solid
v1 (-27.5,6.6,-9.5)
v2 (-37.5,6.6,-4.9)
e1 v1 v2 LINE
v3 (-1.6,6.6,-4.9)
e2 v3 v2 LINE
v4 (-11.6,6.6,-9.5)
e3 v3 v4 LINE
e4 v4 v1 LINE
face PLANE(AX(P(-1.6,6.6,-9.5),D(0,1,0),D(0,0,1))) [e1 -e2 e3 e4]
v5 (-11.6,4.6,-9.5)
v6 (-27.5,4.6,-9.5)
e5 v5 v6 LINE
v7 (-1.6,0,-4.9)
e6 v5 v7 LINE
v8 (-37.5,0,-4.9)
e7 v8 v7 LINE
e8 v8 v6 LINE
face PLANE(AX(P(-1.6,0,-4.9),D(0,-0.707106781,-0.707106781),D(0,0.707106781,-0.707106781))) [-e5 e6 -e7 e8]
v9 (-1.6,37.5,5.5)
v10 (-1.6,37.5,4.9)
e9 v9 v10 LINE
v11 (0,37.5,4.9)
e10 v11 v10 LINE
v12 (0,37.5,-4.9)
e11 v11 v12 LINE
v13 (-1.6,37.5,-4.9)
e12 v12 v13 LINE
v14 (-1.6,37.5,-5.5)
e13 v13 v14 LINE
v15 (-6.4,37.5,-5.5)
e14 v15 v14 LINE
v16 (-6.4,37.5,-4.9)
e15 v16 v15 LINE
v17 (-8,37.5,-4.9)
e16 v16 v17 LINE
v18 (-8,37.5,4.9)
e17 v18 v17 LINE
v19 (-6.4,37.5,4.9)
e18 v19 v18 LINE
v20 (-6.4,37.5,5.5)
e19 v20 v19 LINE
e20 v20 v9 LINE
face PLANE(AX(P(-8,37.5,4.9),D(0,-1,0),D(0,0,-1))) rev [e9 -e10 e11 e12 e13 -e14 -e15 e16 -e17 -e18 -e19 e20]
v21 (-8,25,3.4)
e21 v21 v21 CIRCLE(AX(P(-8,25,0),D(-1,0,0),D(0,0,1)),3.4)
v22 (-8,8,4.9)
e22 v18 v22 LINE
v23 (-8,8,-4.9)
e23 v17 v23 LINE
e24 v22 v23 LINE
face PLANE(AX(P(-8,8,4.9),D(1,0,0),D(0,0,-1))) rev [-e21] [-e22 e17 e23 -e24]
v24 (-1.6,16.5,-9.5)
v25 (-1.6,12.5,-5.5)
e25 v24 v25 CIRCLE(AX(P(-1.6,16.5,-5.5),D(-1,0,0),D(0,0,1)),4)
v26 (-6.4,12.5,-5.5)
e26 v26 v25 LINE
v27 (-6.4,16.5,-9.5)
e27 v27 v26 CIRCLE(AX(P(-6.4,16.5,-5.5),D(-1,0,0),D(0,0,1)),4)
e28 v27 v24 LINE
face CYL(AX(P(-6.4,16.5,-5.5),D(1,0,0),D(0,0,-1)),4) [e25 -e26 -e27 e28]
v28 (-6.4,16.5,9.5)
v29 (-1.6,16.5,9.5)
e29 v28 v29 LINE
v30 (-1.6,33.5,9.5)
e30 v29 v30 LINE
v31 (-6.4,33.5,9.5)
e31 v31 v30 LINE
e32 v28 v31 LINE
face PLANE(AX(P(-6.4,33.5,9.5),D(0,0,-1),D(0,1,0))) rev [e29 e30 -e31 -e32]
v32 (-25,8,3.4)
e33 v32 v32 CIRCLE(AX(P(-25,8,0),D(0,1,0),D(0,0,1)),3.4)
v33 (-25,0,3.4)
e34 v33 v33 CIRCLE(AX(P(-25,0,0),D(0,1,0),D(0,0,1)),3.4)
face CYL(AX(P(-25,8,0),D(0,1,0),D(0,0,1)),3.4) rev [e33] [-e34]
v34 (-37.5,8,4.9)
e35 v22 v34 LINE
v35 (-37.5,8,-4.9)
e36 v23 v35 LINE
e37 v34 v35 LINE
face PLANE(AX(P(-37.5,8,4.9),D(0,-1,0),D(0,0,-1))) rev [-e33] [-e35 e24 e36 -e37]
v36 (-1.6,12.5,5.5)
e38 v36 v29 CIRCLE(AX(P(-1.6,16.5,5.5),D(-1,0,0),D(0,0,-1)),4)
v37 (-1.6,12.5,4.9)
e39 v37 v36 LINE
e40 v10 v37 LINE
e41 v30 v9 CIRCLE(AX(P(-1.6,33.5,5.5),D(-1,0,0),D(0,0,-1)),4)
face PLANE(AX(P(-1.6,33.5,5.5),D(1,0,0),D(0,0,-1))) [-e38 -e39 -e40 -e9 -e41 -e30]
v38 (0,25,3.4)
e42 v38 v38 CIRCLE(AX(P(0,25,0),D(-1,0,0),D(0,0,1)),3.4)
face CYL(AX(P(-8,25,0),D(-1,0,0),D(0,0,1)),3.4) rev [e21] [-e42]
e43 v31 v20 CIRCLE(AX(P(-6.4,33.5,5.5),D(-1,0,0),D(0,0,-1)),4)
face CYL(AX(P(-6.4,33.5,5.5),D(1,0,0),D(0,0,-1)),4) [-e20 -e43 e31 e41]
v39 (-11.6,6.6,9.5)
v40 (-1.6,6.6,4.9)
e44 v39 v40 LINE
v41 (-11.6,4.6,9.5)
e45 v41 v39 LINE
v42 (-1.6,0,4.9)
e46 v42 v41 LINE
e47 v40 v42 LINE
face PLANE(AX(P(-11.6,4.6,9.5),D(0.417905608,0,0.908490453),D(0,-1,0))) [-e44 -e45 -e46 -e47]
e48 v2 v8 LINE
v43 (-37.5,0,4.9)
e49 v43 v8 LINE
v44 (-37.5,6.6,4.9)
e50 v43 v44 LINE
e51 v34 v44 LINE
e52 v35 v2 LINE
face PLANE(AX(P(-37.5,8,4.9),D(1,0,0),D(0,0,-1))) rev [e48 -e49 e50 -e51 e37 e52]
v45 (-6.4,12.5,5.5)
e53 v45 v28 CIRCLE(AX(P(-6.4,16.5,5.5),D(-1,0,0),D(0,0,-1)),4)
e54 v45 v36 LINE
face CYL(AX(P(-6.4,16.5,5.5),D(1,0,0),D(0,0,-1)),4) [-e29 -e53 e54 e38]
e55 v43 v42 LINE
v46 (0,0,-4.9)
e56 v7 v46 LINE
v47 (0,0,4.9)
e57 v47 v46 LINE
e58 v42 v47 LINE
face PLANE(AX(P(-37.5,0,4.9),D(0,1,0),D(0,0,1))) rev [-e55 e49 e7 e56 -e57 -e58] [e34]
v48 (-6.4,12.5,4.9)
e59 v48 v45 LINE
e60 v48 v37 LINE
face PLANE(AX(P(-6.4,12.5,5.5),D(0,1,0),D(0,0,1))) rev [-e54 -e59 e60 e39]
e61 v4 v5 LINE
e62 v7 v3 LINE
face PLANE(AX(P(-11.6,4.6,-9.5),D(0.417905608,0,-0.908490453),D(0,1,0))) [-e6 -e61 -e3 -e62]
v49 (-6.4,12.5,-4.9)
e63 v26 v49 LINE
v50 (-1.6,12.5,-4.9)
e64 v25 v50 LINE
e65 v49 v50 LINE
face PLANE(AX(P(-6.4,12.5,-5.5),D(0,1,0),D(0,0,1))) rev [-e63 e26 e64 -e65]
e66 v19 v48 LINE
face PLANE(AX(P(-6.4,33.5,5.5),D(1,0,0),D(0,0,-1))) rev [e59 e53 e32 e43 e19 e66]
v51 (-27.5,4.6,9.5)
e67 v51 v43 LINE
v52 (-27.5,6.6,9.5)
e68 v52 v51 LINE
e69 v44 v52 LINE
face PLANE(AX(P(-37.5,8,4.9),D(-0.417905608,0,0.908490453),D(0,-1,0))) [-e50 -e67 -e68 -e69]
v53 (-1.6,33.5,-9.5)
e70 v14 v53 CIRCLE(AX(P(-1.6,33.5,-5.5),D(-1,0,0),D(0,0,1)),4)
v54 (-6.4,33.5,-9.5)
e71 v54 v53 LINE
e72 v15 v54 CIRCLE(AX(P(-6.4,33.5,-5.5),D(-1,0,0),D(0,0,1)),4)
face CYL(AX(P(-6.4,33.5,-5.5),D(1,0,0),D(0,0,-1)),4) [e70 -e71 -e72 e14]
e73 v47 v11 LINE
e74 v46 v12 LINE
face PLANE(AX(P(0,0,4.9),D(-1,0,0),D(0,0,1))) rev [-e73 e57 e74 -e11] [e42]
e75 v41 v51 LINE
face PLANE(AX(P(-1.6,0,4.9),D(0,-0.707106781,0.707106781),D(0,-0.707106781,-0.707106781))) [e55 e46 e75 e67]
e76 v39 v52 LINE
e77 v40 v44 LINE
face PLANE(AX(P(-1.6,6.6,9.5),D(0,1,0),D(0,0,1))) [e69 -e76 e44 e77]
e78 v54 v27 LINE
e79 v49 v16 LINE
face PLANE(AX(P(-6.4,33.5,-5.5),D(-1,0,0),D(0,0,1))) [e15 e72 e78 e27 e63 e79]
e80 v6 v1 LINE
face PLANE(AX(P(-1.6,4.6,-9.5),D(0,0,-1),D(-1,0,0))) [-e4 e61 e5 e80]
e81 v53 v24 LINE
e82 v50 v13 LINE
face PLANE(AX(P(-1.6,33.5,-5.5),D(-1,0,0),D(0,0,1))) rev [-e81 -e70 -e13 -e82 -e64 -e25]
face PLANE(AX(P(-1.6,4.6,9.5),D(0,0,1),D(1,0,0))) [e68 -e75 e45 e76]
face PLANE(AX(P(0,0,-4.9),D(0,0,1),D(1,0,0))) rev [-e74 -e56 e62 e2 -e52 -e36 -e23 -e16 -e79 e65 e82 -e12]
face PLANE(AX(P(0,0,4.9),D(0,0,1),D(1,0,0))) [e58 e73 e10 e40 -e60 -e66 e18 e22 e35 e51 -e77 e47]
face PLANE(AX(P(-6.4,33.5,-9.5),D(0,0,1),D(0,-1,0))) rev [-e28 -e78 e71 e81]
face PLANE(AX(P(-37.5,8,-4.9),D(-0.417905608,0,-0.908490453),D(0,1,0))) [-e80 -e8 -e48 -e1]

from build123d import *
from OCP.BRepFilletAPI import BRepFilletAPI_MakeChamfer

# Parameters (mm, degrees)
EXTRUDE_1_DEPTH  = 4.9
EXTRUDE_2_DEPTH  = 35.9
CHAMFER_1_SIZE   = 10
CHAMFER_1_SIZE2  = 4.6
CHAMFER_2_SIZE   = 10
CHAMFER_2_SIZE_2 = 4.6
EXTRUDE_3_DEPTH  = 2.4


with BuildPart() as part:
    # 草图1 → 凸台-拉伸1 (new, symmetric)
    with BuildSketch(Plane.XY):
        Polygon((-37.5, 0), (0, 0), (0, 37.5), (-8, 37.5), (-8, 8), (-37.5, 8), align=None)
    extrude(amount=EXTRUDE_1_DEPTH, both=True)

    # 草图3 → 凸台-拉伸2 (add)
    with BuildSketch(Plane.ZY.offset(37.5)):
        Polygon((-4.9, 0), (-9.5, 4.6), (-9.5, 6.6), (-4.9, 6.6), align=None)
        Polygon((4.9, 6.6), (4.9, 0), (9.5, 4.6), (9.5, 6.6), align=None)
    extrude(amount=-EXTRUDE_2_DEPTH)

    # 倒角1: one chamfer whose edges measure the first distance from different faces: ONE call of the kernel's chamfer builder (chamfer() names one face for all edges)
    chamfer_1_edges_1 = [part.edges().sort_by_distance(p)[0] for p in [
        (-37.5, 5.6, 9.5),
    ]]
    chamfer_1_side_1 = [part.faces().sort_by_distance(p)[0] for p in [
        (-19.55, 5.6, 9.5),
    ]]
    chamfer_1_edges_2 = [part.edges().sort_by_distance(p)[0] for p in [
        (-37.5, 5.6, -9.5),
    ]]
    chamfer_1_side_2 = [part.faces().sort_by_distance(p)[0] for p in [
        (-19.55, 5.6, -9.5),
    ]]
    chamfer_1 = BRepFilletAPI_MakeChamfer(part.part.solid().wrapped)
    for e in chamfer_1_edges_1:
        chamfer_1.Add(CHAMFER_1_SIZE, CHAMFER_1_SIZE2, e.wrapped, chamfer_1_side_1[0].wrapped)  # the first distance lies on this face
    for e in chamfer_1_edges_2:
        chamfer_1.Add(CHAMFER_1_SIZE, CHAMFER_1_SIZE2, e.wrapped, chamfer_1_side_2[0].wrapped)  # the first distance lies on this face
    add(Compound.cast(chamfer_1.Shape()), mode=Mode.REPLACE)

    # 倒角2
    chamfer_2_edges_1 = [part.edges().sort_by_distance(p)[0] for p in [
        (-1.6, 5.6, 9.5),
    ]]
    chamfer_2_side_1 = [part.faces().sort_by_distance(p)[0] for p in [
        (-1.692, 5.6, 9.5),
    ]]
    chamfer_2_edges_2 = [part.edges().sort_by_distance(p)[0] for p in [
        (-1.6, 5.6, -9.5),
    ]]
    chamfer_2_side_2 = [part.faces().sort_by_distance(p)[0] for p in [
        (-1.692, 5.6, -9.5),
    ]]
    chamfer_2 = BRepFilletAPI_MakeChamfer(part.part.solid().wrapped)
    for e in chamfer_2_edges_1:
        chamfer_2.Add(CHAMFER_2_SIZE - 0.0001, CHAMFER_2_SIZE_2 - 0.0001, e.wrapped, chamfer_2_side_1[0].wrapped)
    for e in chamfer_2_edges_2:
        chamfer_2.Add(CHAMFER_2_SIZE - 0.0001, CHAMFER_2_SIZE_2 - 0.0001, e.wrapped, chamfer_2_side_2[0].wrapped)
    add(Compound.cast(chamfer_2.Shape()), mode=Mode.REPLACE)  # a hair under: the kernel refuses the full size

    # 草图5 → 凸台-拉伸3 (add, symmetric)
    with BuildSketch(Plane.ZY.offset(4)):
        with BuildLine():
            Line((-4.9, 37.5), (-5.5, 37.5))
            ThreePointArc((-5.5, 37.5), (-8.328427125, 36.328427125), (-9.5, 33.5))
            Line((-9.5, 33.5), (-9.5, 16.5))
            ThreePointArc((-9.5, 16.5), (-8.328427125, 13.671572875), (-5.5, 12.5))
            Line((-5.5, 12.5), (-4.9, 12.5))
            Line((-4.9, 12.5), (-4.9, 37.5))
        make_face()
        with BuildLine():
            Line((4.9, 12.5), (4.9, 37.5))
            Line((4.9, 37.5), (5.5, 37.5))
            ThreePointArc((5.5, 37.5), (8.328427125, 36.328427125), (9.5, 33.5))
            Line((9.5, 33.5), (9.5, 16.5))
            ThreePointArc((9.5, 16.5), (8.328427125, 13.671572875), (5.5, 12.5))
            Line((5.5, 12.5), (4.9, 12.5))
        make_face()
    extrude(amount=EXTRUDE_3_DEPTH, both=True)

    # 草图7 → M8 螺纹孔1 (revolve, cut)
    with BuildSketch(Plane(origin=(-25, 8, 0), x_dir=(0, 0, 1), z_dir=(1, 0, 0))):
        Polygon((0, 0), (0, 21.792926105), (3.4, 19.75), (3.4, 0), align=None)
    hole_wizard_m8_1 = revolve(axis=Axis((-25, 14.35, 0), (0, -1, 0)), mode=Mode.SUBTRACT)

    # 镜向1: M8 螺纹孔1 across plane
    add(hole_wizard_m8_1.mirror(Plane(origin=(0, 0, 0), x_dir=(0, 0, 1), z_dir=(-0.7071067811865477, -0.7071067811865475, 0))), mode=Mode.SUBTRACT)


solid = part.part
